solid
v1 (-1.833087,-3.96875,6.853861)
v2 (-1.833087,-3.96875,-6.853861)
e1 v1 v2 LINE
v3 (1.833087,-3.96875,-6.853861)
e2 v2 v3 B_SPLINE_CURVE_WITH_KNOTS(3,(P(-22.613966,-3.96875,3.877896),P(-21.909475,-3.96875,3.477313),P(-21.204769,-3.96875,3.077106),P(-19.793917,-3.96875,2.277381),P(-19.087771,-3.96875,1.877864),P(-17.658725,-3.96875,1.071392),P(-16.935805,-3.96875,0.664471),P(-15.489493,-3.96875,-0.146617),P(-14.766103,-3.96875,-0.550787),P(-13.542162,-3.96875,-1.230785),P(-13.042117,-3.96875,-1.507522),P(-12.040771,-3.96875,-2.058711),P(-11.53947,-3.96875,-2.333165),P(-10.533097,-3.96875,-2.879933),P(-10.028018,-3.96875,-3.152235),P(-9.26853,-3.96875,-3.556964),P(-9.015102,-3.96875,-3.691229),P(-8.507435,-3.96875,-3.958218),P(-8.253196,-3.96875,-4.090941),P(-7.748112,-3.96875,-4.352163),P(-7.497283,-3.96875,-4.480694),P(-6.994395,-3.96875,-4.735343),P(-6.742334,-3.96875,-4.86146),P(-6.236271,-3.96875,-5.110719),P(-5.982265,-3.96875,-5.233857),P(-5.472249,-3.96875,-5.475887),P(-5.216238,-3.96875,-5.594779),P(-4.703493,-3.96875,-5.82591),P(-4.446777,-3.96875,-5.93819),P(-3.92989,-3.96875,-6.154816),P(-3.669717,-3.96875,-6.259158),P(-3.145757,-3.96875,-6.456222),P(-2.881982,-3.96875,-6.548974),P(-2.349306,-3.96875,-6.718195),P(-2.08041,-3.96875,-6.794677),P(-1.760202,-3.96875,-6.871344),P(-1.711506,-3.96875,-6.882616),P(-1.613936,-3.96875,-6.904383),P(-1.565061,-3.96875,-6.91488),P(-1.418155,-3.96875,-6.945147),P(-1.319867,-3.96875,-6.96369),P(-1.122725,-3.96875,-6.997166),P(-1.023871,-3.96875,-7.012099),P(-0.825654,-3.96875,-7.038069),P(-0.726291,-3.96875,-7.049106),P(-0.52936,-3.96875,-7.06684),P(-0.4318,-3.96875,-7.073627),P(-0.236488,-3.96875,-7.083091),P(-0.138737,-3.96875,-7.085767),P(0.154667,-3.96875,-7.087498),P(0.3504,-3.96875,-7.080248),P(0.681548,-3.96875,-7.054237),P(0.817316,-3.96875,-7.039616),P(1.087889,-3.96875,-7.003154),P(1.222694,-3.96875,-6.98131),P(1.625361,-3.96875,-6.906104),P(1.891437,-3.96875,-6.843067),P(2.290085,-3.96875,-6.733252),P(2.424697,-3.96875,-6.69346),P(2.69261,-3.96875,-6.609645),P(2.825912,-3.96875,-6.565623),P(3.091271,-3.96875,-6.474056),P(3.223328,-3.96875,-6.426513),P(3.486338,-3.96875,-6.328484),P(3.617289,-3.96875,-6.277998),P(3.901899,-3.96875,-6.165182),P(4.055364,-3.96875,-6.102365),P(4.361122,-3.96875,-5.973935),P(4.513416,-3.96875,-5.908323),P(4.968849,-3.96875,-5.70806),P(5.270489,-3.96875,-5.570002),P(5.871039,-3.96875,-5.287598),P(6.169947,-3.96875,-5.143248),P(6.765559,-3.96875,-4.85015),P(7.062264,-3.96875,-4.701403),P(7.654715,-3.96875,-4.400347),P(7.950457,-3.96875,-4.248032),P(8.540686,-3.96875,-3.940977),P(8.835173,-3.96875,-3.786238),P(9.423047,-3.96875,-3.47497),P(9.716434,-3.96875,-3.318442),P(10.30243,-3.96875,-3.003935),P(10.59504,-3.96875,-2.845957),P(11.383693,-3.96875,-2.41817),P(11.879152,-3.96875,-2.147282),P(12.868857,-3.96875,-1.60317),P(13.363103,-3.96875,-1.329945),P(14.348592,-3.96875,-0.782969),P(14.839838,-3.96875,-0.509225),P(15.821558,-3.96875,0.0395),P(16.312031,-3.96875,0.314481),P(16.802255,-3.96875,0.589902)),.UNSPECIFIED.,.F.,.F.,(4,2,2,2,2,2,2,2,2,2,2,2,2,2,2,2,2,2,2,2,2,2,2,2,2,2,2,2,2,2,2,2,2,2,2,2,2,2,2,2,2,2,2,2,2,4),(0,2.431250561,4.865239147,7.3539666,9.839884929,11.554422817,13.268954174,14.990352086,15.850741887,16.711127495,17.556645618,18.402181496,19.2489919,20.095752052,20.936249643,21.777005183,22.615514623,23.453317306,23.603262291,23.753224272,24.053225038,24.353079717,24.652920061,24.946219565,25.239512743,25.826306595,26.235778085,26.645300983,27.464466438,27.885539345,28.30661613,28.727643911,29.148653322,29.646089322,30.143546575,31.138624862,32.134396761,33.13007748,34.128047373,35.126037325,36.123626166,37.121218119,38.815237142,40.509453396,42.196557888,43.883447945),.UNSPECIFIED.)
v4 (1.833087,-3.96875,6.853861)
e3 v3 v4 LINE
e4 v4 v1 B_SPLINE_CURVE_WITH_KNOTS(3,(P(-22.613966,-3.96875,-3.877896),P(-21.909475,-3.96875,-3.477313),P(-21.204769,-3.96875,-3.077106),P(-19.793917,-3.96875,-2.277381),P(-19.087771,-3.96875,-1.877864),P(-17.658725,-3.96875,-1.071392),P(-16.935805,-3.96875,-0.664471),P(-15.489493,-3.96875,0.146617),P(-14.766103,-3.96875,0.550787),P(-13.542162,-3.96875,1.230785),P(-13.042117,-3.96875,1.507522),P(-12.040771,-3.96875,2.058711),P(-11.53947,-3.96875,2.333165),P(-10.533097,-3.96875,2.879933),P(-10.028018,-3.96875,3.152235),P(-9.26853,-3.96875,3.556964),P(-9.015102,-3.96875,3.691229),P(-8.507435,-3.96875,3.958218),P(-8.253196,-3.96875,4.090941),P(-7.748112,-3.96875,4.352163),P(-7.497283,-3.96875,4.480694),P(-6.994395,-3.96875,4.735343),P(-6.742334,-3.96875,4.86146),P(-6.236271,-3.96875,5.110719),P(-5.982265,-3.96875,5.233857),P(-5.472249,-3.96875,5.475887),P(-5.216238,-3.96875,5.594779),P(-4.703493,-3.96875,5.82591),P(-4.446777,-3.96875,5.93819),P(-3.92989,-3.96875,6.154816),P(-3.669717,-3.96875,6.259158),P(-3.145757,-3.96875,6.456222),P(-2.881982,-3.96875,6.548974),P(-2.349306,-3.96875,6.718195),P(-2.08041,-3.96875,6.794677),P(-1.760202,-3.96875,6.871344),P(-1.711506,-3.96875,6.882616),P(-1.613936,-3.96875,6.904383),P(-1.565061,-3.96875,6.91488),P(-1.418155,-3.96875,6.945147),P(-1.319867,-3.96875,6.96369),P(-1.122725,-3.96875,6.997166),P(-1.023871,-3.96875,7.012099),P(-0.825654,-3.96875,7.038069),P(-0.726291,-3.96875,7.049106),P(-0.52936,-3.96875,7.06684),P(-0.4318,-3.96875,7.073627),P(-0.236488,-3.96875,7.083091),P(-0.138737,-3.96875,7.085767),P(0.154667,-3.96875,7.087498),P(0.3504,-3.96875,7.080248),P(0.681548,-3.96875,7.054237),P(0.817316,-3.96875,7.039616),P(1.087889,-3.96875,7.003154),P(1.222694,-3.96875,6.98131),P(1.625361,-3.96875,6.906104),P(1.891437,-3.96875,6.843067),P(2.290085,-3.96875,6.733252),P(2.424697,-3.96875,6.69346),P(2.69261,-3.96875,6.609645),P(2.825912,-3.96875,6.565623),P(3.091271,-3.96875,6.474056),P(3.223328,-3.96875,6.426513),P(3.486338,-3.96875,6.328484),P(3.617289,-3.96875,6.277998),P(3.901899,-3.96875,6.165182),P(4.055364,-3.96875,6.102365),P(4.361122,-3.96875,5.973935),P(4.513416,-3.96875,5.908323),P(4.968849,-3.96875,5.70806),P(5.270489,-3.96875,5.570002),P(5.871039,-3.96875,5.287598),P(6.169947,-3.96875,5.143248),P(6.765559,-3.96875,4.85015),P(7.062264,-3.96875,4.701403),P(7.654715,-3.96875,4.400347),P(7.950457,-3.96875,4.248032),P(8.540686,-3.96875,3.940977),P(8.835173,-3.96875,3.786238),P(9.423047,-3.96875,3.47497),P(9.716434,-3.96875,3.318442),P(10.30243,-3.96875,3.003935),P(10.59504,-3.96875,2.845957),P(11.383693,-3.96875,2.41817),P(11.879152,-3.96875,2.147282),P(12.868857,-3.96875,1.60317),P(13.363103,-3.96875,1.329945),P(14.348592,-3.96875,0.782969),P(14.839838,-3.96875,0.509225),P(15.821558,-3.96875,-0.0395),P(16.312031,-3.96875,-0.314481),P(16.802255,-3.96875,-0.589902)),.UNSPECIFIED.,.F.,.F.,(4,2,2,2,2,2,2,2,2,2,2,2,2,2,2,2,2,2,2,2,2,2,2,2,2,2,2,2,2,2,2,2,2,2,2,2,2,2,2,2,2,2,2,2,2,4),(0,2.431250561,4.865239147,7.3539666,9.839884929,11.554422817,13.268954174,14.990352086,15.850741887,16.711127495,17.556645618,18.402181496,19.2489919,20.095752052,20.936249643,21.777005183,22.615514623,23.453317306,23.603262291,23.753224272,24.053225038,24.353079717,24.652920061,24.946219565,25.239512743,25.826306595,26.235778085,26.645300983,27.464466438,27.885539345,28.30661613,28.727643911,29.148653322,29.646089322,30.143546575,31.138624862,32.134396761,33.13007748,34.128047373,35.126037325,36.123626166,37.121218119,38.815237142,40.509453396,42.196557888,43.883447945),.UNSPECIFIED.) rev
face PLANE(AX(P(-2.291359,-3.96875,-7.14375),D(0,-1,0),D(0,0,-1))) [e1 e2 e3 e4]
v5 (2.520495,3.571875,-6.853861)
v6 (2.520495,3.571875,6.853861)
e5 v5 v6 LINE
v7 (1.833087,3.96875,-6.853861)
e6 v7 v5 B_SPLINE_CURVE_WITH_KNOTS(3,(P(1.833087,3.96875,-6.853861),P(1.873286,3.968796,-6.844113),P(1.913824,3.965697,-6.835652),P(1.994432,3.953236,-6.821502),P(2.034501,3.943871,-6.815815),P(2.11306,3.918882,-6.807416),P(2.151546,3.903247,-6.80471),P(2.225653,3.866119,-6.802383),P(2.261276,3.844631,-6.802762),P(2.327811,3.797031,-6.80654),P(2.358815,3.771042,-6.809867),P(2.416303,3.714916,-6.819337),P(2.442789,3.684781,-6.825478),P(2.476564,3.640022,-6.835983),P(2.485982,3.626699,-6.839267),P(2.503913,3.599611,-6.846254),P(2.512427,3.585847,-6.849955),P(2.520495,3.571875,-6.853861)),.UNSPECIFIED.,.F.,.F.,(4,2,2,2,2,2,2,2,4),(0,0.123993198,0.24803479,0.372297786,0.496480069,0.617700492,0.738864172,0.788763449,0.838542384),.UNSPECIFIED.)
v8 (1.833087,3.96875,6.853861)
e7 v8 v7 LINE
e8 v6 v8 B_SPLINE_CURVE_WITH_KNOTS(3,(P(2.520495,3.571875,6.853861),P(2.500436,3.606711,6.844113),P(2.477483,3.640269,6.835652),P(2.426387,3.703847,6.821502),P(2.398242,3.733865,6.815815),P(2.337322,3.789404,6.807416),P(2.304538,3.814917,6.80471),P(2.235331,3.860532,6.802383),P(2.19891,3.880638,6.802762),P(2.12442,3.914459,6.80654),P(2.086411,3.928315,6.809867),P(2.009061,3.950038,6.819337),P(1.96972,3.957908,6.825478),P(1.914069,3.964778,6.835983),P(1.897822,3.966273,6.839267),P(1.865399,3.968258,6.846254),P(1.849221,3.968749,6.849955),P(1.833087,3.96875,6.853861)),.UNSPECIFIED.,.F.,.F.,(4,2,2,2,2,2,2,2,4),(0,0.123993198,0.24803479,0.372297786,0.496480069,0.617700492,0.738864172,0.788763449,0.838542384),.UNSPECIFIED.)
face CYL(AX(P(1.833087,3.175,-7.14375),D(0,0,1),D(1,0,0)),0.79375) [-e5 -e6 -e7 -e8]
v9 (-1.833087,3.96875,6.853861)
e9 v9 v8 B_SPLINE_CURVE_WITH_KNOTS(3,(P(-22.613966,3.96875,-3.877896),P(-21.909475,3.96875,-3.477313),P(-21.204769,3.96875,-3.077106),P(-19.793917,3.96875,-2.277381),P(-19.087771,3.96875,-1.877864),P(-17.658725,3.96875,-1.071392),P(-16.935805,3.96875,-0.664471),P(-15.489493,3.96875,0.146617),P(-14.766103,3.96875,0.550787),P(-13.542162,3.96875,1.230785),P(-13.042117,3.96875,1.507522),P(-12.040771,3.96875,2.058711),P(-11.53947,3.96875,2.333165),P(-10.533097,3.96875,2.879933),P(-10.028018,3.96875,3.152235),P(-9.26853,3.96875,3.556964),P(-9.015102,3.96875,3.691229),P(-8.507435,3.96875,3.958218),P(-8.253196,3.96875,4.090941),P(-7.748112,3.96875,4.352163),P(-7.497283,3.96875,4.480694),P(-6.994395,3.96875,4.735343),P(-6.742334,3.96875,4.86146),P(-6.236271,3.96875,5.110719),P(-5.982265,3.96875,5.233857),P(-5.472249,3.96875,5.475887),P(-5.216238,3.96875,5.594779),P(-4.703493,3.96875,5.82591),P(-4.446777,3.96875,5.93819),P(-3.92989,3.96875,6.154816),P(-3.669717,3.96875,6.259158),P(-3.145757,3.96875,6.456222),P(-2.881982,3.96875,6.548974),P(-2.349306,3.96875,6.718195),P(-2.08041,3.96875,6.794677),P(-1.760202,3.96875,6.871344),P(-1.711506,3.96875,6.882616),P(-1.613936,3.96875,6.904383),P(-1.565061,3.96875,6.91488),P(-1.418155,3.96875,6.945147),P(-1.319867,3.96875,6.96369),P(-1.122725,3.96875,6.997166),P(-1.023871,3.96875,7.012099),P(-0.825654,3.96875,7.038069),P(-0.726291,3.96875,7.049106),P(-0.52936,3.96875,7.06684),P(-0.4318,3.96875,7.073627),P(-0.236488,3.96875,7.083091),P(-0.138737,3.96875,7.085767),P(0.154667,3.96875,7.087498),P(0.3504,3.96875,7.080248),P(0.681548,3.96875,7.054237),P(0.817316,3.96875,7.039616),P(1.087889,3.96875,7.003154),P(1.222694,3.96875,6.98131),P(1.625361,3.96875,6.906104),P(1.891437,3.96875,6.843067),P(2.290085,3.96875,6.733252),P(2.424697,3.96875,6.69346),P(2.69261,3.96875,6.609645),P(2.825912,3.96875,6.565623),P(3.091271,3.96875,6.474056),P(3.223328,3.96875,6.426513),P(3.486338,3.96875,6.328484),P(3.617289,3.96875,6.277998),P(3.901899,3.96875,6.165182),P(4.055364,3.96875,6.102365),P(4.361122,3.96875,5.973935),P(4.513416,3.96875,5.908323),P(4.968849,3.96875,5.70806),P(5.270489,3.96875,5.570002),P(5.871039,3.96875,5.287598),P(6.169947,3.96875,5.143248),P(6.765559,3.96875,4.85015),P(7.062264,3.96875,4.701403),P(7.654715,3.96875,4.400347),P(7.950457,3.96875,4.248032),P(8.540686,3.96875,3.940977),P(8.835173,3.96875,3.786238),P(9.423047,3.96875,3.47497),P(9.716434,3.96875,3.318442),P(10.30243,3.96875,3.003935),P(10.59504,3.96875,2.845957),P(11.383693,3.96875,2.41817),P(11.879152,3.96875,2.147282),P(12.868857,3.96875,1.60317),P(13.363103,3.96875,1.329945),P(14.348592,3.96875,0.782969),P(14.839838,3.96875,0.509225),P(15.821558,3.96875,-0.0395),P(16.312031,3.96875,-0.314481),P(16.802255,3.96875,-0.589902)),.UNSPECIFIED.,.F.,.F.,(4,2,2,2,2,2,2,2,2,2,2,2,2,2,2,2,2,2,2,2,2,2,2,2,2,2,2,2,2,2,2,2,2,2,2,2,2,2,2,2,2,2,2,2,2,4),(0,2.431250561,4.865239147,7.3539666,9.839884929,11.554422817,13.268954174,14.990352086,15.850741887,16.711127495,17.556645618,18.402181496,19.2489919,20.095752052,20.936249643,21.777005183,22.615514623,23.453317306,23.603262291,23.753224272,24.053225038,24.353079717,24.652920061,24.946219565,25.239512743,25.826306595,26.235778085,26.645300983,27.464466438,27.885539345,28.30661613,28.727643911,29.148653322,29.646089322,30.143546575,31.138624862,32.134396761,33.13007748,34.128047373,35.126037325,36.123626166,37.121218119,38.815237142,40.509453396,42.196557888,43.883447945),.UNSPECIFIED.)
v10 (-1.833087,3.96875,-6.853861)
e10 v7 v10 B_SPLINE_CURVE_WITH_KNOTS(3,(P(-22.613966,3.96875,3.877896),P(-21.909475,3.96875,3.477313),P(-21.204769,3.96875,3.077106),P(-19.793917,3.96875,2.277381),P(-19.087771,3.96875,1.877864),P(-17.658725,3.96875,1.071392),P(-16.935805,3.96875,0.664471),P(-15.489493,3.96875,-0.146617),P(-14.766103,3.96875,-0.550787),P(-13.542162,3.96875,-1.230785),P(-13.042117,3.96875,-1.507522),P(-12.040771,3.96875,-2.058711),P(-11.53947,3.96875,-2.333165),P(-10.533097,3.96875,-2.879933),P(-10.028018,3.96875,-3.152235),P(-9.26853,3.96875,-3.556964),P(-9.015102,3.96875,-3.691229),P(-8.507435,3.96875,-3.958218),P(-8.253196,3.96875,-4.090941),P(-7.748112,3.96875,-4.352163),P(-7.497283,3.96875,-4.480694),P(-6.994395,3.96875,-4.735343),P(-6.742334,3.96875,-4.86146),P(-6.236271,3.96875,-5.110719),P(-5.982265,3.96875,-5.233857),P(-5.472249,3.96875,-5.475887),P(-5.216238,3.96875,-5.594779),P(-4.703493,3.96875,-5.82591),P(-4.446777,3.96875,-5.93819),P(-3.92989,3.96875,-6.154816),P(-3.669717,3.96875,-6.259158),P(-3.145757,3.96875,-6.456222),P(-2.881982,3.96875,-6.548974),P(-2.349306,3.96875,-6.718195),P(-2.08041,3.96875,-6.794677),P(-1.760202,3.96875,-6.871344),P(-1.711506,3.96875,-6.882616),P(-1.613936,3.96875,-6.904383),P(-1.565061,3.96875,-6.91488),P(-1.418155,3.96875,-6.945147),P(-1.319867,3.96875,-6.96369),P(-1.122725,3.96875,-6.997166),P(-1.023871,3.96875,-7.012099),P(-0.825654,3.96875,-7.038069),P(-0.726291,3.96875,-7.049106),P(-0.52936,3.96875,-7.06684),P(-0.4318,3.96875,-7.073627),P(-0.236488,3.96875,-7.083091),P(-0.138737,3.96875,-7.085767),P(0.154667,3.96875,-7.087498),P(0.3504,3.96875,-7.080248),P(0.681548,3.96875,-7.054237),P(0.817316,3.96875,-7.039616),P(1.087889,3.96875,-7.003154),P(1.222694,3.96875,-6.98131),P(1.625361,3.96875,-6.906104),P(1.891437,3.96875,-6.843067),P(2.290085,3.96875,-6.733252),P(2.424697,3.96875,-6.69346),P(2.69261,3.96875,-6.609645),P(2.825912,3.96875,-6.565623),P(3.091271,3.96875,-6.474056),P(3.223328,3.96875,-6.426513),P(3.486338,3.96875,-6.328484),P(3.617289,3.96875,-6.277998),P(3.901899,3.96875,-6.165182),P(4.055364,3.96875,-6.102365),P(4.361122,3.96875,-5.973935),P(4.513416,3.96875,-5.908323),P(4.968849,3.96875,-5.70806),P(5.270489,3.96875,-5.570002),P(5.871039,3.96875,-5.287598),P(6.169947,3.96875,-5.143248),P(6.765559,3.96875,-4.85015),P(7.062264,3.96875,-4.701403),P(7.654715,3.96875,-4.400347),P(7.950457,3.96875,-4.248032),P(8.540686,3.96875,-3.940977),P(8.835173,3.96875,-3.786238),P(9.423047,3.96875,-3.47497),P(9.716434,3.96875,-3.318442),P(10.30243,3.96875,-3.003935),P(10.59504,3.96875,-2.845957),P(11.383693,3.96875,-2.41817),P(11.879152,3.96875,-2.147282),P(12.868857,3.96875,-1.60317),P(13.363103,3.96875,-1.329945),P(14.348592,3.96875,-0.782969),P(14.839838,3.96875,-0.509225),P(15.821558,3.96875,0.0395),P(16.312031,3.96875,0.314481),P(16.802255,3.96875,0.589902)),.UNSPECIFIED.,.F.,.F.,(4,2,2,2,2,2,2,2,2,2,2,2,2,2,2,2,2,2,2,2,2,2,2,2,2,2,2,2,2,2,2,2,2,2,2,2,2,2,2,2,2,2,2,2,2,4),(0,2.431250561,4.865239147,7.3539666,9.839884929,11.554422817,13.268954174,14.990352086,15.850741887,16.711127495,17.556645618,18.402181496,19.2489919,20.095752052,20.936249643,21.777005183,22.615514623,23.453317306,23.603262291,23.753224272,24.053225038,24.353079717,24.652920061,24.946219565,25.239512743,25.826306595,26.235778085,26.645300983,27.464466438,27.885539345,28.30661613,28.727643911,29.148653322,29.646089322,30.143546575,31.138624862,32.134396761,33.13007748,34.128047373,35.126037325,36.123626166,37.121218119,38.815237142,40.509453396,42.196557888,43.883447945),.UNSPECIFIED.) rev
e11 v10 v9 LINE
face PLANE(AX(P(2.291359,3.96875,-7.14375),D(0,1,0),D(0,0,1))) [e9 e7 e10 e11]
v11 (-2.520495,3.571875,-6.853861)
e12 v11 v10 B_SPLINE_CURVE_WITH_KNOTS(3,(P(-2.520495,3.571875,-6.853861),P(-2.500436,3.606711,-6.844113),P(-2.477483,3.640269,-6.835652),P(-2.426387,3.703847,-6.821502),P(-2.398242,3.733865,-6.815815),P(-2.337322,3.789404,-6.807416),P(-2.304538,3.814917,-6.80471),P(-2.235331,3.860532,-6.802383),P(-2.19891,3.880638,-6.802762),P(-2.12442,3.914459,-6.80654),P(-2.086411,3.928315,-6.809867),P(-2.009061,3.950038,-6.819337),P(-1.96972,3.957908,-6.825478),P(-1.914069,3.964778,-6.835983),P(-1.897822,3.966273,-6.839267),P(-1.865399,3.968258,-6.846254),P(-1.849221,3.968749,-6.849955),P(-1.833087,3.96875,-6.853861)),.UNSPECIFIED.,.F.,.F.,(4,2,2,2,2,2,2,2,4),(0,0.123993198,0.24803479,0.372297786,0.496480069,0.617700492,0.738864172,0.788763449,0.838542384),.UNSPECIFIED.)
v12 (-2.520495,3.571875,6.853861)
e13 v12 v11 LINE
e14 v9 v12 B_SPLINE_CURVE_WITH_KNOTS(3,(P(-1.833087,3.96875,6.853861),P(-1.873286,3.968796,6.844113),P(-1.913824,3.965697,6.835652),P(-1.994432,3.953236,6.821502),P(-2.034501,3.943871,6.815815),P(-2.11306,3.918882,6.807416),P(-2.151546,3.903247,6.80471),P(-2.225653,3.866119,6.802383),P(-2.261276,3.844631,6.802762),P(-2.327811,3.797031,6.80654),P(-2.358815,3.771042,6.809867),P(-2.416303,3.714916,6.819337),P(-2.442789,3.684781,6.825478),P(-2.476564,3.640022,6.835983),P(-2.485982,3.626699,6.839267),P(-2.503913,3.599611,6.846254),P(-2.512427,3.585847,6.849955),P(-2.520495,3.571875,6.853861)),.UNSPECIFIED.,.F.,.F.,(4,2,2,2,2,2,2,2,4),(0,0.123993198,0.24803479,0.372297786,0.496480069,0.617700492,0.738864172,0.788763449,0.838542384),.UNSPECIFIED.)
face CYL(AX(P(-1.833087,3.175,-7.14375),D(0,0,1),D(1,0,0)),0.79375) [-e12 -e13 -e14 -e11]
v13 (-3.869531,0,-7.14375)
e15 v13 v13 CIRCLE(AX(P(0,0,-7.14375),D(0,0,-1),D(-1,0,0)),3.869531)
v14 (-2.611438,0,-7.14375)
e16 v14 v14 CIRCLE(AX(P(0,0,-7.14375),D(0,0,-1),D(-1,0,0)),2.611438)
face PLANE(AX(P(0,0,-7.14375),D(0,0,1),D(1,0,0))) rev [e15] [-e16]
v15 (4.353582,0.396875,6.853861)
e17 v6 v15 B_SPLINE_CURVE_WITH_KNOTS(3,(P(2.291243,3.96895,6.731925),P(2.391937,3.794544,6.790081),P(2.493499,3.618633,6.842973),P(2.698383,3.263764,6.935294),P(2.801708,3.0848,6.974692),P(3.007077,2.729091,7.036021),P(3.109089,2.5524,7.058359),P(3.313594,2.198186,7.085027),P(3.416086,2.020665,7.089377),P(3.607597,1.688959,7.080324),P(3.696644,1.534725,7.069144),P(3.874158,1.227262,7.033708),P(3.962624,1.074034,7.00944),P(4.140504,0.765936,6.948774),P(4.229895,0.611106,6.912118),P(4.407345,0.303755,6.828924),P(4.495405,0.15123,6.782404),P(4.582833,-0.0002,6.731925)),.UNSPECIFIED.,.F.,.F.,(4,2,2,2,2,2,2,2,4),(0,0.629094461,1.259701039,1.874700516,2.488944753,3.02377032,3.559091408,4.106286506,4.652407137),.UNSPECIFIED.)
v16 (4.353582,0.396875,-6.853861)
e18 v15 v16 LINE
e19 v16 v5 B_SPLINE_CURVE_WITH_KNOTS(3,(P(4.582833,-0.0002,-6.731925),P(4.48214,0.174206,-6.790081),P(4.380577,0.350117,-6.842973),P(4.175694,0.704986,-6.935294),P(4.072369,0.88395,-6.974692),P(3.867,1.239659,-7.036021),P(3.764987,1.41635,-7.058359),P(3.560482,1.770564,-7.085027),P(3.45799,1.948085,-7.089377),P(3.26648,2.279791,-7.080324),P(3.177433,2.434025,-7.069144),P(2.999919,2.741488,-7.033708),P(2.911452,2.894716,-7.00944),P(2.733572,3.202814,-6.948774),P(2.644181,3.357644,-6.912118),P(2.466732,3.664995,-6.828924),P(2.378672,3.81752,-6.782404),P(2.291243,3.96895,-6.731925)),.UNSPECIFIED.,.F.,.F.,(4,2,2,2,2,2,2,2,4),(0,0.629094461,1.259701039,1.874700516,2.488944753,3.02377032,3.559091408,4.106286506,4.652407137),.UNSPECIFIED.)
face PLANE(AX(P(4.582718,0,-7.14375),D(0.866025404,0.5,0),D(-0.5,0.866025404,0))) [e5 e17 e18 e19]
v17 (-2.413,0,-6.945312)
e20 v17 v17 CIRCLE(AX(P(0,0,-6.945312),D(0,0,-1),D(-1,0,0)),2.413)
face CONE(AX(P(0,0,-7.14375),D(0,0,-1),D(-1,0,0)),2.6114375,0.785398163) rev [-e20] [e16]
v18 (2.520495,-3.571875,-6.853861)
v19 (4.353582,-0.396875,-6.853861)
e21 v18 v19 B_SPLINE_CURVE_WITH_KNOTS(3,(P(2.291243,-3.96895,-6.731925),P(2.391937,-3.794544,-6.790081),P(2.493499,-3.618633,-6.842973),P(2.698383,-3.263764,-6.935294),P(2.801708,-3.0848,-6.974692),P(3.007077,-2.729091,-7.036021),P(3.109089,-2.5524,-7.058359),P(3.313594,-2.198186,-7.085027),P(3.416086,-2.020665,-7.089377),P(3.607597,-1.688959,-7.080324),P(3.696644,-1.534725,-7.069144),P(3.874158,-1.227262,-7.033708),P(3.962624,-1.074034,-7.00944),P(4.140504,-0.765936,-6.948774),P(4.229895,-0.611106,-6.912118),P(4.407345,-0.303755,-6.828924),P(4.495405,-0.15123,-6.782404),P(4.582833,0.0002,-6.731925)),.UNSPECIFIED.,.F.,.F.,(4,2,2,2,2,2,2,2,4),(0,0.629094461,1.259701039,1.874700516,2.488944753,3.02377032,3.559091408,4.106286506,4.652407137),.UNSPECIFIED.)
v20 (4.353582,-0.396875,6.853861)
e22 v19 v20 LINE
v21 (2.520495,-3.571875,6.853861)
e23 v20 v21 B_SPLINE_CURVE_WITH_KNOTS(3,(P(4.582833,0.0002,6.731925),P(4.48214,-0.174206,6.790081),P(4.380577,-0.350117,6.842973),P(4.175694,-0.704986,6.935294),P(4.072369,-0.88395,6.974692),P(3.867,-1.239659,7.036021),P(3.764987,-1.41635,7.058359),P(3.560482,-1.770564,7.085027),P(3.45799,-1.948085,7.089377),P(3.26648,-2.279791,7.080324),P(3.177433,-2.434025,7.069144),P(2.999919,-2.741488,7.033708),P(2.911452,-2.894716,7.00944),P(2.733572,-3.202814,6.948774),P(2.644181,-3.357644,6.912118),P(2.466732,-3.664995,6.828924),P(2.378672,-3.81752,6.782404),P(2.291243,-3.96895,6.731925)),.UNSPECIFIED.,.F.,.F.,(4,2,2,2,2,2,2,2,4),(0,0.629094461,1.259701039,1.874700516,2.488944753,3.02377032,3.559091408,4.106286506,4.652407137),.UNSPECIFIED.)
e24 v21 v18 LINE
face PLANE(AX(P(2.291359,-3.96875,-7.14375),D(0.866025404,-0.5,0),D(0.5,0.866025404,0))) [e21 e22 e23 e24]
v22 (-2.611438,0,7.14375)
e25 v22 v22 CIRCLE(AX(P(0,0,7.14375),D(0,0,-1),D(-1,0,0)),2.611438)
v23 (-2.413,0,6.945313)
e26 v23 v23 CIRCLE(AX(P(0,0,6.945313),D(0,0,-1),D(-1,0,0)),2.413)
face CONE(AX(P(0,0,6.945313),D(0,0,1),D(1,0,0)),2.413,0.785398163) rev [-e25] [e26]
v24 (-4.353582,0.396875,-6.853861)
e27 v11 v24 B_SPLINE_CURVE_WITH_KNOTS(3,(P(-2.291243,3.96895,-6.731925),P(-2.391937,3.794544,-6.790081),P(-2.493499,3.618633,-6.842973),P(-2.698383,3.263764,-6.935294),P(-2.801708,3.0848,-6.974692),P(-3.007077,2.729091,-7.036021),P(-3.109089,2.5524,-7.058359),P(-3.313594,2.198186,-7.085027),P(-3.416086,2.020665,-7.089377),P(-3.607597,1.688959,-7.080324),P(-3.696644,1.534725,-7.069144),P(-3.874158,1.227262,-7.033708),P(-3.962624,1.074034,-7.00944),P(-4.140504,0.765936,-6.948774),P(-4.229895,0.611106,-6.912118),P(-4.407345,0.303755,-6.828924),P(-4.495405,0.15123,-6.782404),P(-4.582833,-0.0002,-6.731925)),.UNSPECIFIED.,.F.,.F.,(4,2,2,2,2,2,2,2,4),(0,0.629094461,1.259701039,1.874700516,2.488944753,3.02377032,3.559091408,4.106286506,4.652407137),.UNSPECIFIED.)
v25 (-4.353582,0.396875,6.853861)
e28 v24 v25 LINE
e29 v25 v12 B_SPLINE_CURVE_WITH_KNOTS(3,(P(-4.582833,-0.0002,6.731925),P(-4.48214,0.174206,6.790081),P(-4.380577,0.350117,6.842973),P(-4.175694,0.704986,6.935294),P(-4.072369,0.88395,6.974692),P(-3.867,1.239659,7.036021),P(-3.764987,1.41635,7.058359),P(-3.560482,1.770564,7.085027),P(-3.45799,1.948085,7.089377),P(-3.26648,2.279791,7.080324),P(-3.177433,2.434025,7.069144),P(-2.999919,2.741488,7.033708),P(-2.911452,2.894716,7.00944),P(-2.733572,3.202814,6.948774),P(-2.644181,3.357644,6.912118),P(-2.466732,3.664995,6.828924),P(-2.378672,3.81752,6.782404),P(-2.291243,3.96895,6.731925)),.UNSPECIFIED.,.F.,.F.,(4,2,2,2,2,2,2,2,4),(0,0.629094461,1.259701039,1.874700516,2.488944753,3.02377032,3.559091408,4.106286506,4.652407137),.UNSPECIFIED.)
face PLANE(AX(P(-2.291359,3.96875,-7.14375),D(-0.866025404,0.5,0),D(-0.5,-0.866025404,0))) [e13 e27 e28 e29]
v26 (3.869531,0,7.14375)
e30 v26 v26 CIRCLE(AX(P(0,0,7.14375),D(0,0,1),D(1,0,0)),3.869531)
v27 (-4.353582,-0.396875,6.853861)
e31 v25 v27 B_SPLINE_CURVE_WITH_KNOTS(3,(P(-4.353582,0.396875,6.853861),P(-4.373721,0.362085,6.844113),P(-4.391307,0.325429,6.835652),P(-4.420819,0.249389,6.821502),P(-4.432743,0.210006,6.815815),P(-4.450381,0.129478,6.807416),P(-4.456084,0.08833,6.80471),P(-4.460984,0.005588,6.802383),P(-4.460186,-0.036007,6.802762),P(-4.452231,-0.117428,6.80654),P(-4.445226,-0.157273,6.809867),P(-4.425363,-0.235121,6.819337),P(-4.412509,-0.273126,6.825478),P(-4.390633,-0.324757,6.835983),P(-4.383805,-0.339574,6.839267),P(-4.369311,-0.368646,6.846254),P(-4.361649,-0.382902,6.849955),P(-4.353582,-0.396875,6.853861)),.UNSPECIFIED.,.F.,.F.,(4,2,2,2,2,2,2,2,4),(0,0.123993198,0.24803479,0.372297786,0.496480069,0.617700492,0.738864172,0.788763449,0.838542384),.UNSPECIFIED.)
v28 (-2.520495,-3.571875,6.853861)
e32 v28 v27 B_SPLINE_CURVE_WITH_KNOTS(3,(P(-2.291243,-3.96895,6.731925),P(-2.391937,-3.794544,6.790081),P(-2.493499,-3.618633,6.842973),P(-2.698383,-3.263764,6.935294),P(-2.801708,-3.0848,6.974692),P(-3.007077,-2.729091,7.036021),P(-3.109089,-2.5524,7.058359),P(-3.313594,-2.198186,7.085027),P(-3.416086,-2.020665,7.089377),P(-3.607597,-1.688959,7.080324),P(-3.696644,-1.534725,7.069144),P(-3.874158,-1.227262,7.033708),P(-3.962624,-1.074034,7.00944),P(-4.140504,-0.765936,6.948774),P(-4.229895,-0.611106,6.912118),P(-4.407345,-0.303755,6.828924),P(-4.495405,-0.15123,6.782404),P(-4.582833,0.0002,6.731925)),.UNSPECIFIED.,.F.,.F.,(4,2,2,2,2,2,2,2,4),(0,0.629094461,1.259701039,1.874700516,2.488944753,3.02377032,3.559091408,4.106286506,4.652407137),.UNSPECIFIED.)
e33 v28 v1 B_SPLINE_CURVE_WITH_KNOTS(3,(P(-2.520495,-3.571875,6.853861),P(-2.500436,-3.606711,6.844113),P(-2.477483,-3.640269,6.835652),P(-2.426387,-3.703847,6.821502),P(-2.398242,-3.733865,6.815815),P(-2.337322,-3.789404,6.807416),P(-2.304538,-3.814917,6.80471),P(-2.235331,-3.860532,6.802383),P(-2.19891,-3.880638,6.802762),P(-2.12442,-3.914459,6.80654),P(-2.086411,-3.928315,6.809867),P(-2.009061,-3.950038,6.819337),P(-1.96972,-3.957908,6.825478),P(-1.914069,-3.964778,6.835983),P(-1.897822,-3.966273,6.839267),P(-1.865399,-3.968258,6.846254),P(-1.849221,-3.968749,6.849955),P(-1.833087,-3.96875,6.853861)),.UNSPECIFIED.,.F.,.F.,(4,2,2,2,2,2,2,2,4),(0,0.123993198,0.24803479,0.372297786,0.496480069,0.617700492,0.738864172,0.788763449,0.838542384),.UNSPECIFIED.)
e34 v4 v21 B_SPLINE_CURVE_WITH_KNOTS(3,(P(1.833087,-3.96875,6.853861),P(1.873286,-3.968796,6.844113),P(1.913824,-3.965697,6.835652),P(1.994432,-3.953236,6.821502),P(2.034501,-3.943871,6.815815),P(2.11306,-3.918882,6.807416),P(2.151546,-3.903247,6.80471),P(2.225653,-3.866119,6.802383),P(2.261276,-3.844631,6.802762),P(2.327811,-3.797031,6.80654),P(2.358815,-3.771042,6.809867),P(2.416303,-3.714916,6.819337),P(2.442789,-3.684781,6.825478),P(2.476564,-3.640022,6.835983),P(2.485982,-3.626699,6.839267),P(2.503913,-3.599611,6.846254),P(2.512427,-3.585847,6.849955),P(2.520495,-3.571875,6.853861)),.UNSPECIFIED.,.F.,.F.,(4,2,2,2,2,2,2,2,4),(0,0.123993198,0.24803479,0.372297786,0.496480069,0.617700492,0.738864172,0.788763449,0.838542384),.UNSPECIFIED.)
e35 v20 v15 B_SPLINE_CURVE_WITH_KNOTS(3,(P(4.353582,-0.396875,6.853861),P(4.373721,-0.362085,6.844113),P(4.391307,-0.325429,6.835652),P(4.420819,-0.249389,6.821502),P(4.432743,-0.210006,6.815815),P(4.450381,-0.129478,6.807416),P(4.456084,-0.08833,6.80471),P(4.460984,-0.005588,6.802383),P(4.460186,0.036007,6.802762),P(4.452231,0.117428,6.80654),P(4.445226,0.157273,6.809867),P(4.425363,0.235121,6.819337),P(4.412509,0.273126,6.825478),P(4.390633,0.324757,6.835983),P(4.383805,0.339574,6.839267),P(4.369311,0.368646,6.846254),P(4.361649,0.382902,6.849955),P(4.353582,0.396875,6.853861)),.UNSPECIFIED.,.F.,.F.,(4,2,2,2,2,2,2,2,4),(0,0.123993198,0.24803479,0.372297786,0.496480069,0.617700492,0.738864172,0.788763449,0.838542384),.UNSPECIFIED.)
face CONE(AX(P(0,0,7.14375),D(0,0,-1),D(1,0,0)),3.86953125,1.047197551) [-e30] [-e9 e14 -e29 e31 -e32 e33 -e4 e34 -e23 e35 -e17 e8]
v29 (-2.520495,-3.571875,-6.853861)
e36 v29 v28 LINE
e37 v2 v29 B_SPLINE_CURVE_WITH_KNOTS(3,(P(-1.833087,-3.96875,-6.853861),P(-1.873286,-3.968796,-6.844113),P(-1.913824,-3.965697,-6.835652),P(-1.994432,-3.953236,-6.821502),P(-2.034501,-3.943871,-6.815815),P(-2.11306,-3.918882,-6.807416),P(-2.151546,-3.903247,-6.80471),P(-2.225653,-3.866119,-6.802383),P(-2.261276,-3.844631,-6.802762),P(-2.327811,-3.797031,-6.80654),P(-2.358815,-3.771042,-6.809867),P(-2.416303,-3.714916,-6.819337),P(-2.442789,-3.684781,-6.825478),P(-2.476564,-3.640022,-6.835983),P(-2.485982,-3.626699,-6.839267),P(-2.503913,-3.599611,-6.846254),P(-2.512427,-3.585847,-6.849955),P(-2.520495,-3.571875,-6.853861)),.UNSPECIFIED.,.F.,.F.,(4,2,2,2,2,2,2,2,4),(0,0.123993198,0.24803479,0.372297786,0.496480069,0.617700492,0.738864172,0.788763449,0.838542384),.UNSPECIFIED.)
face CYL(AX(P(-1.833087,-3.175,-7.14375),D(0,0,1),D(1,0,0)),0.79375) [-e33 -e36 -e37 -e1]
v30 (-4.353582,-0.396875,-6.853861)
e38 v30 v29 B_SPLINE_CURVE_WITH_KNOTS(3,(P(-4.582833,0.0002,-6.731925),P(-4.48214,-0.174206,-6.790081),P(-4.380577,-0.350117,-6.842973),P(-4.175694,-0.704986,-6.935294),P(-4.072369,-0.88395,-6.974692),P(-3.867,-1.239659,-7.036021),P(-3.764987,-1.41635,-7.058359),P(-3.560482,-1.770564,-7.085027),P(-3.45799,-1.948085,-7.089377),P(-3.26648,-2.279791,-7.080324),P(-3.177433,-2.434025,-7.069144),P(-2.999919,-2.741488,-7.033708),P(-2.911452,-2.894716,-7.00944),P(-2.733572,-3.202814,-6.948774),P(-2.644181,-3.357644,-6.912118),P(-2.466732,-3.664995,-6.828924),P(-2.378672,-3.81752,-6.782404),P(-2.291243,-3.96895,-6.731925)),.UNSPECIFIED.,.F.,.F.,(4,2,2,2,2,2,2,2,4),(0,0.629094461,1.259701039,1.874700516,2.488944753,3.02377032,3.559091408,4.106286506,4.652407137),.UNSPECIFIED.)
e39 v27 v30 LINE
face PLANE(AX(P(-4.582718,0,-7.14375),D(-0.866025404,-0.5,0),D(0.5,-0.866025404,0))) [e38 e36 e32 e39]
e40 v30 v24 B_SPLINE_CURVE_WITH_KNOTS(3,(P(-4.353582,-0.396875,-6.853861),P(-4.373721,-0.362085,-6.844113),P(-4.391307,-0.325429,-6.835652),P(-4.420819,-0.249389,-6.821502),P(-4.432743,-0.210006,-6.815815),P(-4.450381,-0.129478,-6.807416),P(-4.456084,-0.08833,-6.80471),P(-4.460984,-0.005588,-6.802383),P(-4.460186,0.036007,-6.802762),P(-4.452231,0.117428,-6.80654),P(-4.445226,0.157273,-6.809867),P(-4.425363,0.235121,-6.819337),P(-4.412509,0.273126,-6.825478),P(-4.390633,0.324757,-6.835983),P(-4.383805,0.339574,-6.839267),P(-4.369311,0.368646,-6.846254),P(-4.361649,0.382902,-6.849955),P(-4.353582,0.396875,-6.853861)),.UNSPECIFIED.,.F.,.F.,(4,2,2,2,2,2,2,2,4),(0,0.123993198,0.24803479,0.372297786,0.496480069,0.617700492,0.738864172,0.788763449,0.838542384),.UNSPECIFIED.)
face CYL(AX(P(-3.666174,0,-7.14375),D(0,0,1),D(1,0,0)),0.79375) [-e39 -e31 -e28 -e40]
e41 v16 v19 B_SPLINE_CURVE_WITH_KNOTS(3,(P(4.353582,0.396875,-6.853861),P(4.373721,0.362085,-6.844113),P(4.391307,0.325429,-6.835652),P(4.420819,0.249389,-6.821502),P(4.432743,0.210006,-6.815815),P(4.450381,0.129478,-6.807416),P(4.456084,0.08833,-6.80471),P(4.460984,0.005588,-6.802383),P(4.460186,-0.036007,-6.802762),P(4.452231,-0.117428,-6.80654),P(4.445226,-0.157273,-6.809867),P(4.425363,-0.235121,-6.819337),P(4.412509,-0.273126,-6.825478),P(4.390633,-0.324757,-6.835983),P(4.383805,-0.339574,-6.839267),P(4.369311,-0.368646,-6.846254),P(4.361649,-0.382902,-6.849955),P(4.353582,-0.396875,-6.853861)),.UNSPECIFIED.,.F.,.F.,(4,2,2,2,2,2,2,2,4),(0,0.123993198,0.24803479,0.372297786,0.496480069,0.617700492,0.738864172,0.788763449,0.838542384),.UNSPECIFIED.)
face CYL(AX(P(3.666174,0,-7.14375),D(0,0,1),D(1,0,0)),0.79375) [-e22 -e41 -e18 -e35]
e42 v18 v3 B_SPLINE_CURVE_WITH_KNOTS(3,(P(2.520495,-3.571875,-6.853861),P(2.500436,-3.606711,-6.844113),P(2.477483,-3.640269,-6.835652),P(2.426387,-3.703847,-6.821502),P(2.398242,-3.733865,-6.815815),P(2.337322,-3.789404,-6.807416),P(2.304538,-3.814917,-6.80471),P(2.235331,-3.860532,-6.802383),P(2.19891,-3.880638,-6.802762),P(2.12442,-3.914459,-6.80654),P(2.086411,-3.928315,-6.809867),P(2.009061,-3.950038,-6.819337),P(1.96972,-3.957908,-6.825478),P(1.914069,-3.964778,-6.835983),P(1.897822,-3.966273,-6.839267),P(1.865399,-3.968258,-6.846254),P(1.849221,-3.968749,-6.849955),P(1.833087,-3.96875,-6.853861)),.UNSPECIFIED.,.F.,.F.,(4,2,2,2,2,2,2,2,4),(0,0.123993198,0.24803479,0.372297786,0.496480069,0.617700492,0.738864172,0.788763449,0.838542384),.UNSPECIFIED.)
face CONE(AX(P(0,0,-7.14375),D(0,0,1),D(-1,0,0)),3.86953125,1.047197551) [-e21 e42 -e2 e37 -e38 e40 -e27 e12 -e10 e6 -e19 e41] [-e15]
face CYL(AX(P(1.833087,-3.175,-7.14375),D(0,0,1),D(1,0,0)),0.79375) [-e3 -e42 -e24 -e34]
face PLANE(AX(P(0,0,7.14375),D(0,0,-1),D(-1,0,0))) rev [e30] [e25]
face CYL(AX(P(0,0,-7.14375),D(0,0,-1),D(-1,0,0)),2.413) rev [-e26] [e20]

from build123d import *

# Parameters (mm, degrees)
SKETCH4_R           = 3.190875
BOSS_EXTRUDE1_DEPTH = 7.14375
SKETCH5_OUTSIDE_W   = 72.142
SKETCH5_OUTSIDE_H   = 70.914
SKETCH5_OUTSIDE_R   = 3.86953125
CUT_EXTRUDE1_DEPTH  = 16.520468256
CUT_EXTRUDE1_DRAFT  = -60
SKETCH6_OUTSIDE_W   = 72.142
SKETCH6_OUTSIDE_H   = 70.914
SKETCH6_OUTSIDE_R   = 3.86953125
CUT_EXTRUDE2_DEPTH  = 16.520468256
CUT_EXTRUDE2_DRAFT  = -60
FILLET1_R           = 0.79375


with BuildPart() as part:
    # Sketch3 → Revolve1 (revolve)
    with BuildSketch(Plane(origin=(0, 0, 0), x_dir=(0, 0, -1), z_dir=(1, 0, 0)), mode=Mode.PRIVATE) as revolve1_sk:
        Polygon((7.14375, 2.6114375), (7.14375, 3.96875), (0, 3.96875), (-7.14375, 3.96875), (-7.14375, 2.6114375), (-6.9453125, 2.413), (6.9453125, 2.413), align=None)
        Polygon((7.14375, 2.6114375), (7.14375, 3.96875), (0, 3.96875), (-7.14375, 3.96875), (-7.14375, 2.6114375), (-6.9453125, 2.413), (6.9453125, 2.413), align=None)
    revolve(revolve1_sk.sketch.rotate(Axis((0, 0, -7.14375), (0, 0, 1)), 90), axis=Axis((0, 0, -7.14375), (0, 0, 1)))

    # Sketch4 → Boss-Extrude1 (add, symmetric)
    with BuildSketch(Plane.XY):
        Polygon((-2.291358881, 3.96875), (-4.582717762, 0), (-2.291358881, -3.96875), (2.291358881, -3.96875), (4.582717762, 0), (2.291358881, 3.96875), align=None)
        Circle(SKETCH4_R, mode=Mode.SUBTRACT)
    extrude(amount=BOSS_EXTRUDE1_DEPTH, both=True)


with BuildPart() as cut_extrude1_tool:
    # Sketch5 outside → Cut-Extrude1 (with draft: the straight prism first)
    with BuildSketch(Plane.XY.offset(7.14375)):
        Rectangle(SKETCH5_OUTSIDE_W, SKETCH5_OUTSIDE_H)
        Circle(SKETCH5_OUTSIDE_R, mode=Mode.SUBTRACT)
    extrude(amount=-CUT_EXTRUDE1_DEPTH)
    # Cut-Extrude1: the draft: its side faces are tilted about the plane it starts from
    cut_extrude1_sides = [cut_extrude1_tool.faces().sort_by_distance(p)[0] for p in [
        (0, -35.457, -1.116484128),
        (36.071, 0, -1.116484128),
        (0, 35.457, -1.116484128),
        (-36.071, 0, -1.116484128),
        (-3.86953125, 0, -1.116484128),
    ]]
    draft(cut_extrude1_sides, Plane.XY.offset(7.14375), CUT_EXTRUDE1_DRAFT)


with BuildPart() as part_1:
    add(part.part)

    # Cut-Extrude1: cut by cut_extrude1_tool
    add(cut_extrude1_tool.part, mode=Mode.SUBTRACT)


with BuildPart() as cut_extrude2_tool:
    # Sketch6 outside → Cut-Extrude2 (with draft: the straight prism first)
    with BuildSketch(Plane(origin=(0, 0, -7.14375), x_dir=(-1, 0, 0), z_dir=(0, 0, -1))):
        Rectangle(SKETCH6_OUTSIDE_W, SKETCH6_OUTSIDE_H)
        Circle(SKETCH6_OUTSIDE_R, mode=Mode.SUBTRACT)
    extrude(amount=-CUT_EXTRUDE2_DEPTH)
    # Cut-Extrude2: the draft: its side faces are tilted about the plane it starts from
    cut_extrude2_sides = [cut_extrude2_tool.faces().sort_by_distance(p)[0] for p in [
        (0, -35.457, 1.116484128),
        (-36.071, 0, 1.116484128),
        (0, 35.457, 1.116484128),
        (36.071, 0, 1.116484128),
        (3.86953125, 0, 1.116484128),
    ]]
    draft(cut_extrude2_sides, Plane(origin=(0, 0, -7.14375), x_dir=(-1, 0, 0), z_dir=(0, 0, -1)), CUT_EXTRUDE2_DRAFT)


with BuildPart() as part_2:
    add(part_1.part)

    # Cut-Extrude2: cut by cut_extrude2_tool
    add(cut_extrude2_tool.part, mode=Mode.SUBTRACT)

    # Fillet1
    # the kernel refuses this fillet: 0.79375 mm, written as the material it takes off along each edge
    with BuildSketch(Plane(origin=(2.291358881, 3.96875, 7.877671016), x_dir=(0.49999999999999933, -0.866025403784439, 0), z_dir=(0, 0, -1)), Plane(origin=(-4.582717762, 0, -7.877671016), x_dir=(0.5000000000000004, -0.8660254037844384, 0), z_dir=(0, 0, 1)), Plane(origin=(4.582717762, 0, 7.877671016), x_dir=(-0.49999999999999917, -0.8660254037844392, 0), z_dir=(0, 0, -1)), Plane(origin=(-2.291358881, 3.96875, 7.877671016), x_dir=(1, 0, 0), z_dir=(0, 0, -1))) as fillet1_piece_1:
        with BuildLine():
            CenterArc((FILLET1_R * 0.57735026919, FILLET1_R), FILLET1_R, 210, 60)
            Line((-FILLET1_R * 0.288675134595, FILLET1_R * 0.5), (0, 0))
            Line((0, 0), (FILLET1_R * 0.57735026919, 0))
        make_face()
    extrude(amount=15.755342032, mode=Mode.SUBTRACT)
    with BuildSketch(Plane(origin=(-2.291358881, -3.96875, -7.877671016), x_dir=(-0.5000000000000001, 0.8660254037844386, 0), z_dir=(0, 0, 1)), Plane(origin=(2.291358881, -3.96875, -7.877671016), x_dir=(-1, 0, 0), z_dir=(0, 0, 1))) as fillet1_piece_2:
        with BuildLine():
            CenterArc((FILLET1_R * 0.57735026919, -FILLET1_R), FILLET1_R, 90, 60)
            Line((-FILLET1_R * 0.288675134595, -FILLET1_R * 0.5), (0, 0))
            Line((0, 0), (FILLET1_R * 0.57735026919, 0))
        make_face()
    extrude(amount=15.755342032, mode=Mode.SUBTRACT)


solid = part_2.part
